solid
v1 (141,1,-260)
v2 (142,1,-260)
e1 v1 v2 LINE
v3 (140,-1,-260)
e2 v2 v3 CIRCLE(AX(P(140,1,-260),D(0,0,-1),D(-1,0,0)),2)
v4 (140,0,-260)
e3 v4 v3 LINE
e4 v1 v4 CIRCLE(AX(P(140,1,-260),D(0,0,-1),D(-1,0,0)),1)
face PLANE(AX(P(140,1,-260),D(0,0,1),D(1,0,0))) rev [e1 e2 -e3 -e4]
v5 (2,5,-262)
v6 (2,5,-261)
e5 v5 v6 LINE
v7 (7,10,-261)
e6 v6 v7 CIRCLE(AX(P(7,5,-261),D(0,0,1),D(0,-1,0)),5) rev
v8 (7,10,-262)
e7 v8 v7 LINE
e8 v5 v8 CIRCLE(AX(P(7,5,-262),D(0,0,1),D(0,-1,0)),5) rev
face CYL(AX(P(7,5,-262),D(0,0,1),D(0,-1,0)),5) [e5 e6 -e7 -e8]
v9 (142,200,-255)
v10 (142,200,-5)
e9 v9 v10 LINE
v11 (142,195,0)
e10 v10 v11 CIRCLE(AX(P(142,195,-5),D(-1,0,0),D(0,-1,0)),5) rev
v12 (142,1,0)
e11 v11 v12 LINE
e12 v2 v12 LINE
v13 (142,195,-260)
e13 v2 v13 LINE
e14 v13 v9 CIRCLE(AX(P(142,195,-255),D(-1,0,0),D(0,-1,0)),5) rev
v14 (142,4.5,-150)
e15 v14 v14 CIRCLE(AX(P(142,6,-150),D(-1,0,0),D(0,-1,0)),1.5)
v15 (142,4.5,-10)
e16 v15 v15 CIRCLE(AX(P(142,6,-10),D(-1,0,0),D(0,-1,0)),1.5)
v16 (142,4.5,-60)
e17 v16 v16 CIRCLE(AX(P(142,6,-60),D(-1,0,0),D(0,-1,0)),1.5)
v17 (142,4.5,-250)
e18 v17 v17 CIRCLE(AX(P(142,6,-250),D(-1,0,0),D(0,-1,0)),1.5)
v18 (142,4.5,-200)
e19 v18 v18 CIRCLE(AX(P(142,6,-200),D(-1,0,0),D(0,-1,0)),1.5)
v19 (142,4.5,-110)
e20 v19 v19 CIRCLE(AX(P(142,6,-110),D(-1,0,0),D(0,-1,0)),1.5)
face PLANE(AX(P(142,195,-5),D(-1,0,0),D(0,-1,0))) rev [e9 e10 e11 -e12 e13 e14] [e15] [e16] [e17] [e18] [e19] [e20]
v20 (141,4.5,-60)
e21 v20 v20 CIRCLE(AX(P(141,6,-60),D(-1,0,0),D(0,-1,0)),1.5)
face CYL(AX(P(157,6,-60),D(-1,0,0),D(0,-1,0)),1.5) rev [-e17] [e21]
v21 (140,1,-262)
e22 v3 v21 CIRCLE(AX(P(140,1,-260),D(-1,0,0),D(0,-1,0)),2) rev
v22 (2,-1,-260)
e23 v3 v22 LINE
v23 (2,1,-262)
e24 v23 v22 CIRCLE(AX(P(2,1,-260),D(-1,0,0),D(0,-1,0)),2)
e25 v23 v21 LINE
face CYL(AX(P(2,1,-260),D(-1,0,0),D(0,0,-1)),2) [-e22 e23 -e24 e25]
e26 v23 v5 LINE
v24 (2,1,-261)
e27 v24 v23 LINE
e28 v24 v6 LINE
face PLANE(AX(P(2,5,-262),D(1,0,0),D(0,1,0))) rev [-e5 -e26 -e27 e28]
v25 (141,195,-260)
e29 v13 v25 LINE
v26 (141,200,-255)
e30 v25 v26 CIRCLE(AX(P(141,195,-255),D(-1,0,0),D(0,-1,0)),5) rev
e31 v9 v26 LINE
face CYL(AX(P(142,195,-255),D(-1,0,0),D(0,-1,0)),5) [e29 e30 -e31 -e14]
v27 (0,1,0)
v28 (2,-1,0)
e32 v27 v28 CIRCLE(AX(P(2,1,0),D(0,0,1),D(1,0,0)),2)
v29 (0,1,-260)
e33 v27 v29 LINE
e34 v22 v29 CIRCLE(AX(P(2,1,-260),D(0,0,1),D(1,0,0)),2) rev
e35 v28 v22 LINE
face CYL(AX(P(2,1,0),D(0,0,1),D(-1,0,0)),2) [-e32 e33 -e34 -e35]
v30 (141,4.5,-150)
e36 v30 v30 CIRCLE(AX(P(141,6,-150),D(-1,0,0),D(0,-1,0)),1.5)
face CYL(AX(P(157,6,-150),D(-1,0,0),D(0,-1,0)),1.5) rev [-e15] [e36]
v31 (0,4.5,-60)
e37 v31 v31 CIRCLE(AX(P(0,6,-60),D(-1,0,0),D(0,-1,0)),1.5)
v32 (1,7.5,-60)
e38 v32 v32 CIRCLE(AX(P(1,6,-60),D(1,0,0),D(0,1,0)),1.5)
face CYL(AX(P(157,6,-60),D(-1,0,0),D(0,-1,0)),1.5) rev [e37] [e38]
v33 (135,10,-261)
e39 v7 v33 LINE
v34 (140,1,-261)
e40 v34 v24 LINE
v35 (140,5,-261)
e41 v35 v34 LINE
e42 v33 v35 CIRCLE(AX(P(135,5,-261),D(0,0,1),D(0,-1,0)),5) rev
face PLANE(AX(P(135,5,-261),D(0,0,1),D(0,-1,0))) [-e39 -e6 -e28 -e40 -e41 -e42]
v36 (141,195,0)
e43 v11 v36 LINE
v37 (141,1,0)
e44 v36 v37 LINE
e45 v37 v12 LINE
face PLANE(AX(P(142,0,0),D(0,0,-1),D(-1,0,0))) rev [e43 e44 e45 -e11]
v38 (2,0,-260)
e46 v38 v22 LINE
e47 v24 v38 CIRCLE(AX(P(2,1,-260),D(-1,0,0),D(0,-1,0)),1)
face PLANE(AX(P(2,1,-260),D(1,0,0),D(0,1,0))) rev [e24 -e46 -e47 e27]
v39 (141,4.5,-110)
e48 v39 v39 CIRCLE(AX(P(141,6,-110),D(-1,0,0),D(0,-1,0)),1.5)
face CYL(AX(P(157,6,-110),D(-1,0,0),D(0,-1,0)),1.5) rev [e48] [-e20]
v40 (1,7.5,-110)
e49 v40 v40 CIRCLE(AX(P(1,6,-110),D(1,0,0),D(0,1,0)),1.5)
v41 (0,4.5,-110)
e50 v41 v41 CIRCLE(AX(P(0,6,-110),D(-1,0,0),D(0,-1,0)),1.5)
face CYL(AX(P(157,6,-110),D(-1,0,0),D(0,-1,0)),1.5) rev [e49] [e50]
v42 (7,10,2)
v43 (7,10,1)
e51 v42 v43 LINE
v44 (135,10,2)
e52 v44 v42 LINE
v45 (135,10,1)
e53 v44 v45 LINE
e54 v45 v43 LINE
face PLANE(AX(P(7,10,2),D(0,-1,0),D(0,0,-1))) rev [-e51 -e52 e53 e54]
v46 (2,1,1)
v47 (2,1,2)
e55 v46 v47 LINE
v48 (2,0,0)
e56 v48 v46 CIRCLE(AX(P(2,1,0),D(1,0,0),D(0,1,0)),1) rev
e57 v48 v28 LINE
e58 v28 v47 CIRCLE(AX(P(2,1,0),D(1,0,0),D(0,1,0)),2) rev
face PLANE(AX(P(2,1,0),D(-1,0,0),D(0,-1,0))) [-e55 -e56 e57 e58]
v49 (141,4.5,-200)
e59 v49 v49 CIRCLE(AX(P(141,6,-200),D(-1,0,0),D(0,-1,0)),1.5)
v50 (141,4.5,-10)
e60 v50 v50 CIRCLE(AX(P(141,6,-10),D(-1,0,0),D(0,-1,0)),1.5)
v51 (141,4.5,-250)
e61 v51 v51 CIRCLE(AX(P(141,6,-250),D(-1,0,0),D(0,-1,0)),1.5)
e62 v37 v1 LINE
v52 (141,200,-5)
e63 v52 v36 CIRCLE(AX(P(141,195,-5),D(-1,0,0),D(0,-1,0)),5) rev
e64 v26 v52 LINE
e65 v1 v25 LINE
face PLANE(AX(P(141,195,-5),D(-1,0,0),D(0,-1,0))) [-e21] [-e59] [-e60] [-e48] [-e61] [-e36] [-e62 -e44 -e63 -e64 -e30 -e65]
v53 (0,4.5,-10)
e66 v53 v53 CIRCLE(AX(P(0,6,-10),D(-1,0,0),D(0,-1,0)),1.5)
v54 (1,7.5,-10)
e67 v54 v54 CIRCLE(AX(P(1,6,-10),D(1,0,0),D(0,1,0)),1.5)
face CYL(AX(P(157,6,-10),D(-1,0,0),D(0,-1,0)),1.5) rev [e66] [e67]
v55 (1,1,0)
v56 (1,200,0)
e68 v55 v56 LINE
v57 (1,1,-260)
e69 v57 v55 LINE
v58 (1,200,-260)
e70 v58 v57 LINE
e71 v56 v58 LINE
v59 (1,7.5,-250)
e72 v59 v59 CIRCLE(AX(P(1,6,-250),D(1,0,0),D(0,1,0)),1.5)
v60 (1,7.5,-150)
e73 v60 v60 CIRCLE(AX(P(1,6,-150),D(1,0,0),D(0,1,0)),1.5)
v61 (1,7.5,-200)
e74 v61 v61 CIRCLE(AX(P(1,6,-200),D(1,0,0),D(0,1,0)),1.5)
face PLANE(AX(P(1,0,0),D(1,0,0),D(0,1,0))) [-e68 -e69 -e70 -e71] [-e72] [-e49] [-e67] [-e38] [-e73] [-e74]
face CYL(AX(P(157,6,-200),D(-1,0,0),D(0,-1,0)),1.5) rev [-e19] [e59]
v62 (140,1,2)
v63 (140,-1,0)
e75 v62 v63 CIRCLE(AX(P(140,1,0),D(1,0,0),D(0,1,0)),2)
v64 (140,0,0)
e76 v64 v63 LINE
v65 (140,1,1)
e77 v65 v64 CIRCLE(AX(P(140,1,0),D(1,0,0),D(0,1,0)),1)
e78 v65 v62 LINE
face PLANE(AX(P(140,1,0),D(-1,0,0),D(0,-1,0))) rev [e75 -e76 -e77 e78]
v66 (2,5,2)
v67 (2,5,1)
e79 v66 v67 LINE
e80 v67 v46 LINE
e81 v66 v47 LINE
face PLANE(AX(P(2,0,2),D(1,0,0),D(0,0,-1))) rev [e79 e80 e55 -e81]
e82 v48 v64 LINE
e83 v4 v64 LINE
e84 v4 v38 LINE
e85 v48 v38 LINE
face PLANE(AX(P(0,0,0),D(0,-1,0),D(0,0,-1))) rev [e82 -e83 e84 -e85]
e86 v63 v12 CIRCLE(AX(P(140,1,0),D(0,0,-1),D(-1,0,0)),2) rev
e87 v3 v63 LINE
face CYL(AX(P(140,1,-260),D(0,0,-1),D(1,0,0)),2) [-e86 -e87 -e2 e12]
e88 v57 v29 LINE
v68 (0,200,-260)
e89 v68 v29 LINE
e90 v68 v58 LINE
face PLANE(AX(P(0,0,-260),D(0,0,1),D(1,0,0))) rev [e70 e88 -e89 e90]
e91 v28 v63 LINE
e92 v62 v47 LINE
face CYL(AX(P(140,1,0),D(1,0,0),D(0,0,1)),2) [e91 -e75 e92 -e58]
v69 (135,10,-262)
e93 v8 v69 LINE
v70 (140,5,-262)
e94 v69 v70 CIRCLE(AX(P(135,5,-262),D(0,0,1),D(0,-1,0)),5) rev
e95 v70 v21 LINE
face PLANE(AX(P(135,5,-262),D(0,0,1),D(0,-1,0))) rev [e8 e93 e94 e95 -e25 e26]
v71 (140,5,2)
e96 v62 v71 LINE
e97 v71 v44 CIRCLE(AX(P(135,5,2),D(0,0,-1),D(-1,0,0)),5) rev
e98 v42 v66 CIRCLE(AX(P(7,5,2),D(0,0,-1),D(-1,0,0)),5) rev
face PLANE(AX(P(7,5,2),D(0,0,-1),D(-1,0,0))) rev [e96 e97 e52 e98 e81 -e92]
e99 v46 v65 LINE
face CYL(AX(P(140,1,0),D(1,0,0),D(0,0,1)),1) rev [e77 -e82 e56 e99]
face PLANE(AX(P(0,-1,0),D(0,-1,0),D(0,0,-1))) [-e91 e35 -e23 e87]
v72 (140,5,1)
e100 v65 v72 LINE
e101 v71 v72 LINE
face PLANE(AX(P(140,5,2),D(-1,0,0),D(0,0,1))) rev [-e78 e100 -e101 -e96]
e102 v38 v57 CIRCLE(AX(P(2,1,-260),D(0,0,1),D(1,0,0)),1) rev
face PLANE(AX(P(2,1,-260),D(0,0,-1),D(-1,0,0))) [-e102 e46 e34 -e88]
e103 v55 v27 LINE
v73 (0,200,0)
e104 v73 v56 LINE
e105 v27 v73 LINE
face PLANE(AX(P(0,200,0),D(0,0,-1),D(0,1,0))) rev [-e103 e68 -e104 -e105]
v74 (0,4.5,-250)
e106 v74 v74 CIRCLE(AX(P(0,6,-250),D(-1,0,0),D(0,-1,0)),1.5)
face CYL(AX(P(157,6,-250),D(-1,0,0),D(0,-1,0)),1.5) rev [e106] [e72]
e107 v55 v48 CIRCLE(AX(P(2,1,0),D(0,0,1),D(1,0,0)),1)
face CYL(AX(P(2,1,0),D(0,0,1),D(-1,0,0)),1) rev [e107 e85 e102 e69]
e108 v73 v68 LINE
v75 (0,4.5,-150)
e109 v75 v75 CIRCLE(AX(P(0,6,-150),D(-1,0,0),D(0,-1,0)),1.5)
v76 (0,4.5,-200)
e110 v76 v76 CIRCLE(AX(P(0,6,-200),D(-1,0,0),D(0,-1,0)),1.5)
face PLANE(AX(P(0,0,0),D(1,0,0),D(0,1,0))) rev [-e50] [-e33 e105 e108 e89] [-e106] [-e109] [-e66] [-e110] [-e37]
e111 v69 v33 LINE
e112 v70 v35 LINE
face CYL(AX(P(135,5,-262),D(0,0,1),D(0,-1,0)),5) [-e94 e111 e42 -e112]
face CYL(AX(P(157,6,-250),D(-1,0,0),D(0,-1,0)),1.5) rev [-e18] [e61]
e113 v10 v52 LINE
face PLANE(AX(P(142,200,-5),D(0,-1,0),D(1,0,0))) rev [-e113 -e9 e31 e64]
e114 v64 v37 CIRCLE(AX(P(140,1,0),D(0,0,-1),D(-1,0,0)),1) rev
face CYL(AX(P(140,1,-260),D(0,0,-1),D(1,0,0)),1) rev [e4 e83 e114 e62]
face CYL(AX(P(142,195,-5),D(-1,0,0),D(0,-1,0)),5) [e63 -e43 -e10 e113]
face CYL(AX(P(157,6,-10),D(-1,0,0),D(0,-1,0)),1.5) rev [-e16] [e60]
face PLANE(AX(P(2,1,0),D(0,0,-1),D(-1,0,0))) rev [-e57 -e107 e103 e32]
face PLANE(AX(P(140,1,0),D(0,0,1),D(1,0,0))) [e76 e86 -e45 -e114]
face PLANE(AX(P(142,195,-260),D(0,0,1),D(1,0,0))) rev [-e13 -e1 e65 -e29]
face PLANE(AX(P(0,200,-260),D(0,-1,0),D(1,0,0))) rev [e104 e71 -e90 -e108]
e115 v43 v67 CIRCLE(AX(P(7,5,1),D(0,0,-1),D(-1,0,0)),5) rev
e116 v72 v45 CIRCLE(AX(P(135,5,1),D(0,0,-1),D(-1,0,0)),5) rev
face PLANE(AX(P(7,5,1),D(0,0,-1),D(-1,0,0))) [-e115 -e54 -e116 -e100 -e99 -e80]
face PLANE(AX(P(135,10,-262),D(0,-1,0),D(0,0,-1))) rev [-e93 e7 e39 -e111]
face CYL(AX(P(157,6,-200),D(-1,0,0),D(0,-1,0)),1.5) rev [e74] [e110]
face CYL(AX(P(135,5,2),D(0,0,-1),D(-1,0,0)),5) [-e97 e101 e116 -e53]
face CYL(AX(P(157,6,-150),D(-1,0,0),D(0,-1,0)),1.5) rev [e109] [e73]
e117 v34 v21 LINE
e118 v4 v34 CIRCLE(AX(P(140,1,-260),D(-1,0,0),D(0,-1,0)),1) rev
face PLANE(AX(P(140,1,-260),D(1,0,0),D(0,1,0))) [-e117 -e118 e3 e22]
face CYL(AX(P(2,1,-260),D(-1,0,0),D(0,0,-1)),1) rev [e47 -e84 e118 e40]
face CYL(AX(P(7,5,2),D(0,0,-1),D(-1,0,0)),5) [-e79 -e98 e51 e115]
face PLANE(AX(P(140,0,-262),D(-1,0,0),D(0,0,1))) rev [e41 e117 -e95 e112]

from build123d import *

# Parameters (mm, degrees)
SKETCH1_W                    = 142
SKETCH1_H                    = 260
BASE_FLANGE1_DEPTH           = 1
EDGE_FLANGE1_STRIP_W         = 6
EDGE_FLANGE1_STRIP_H         = 1
EDGE_FLANGE1_STRIP_CUT_DEPTH = 260
EDGE_FLANGE1_DEPTH           = 260
EDGE_FLANGE2_STRIP_W         = 6
EDGE_FLANGE2_STRIP_H         = 1
EDGE_FLANGE2_STRIP_CUT_DEPTH = 260
EDGE_FLANGE2_DEPTH           = 260
EDGE_FLANGE2_FLAT_DEPTH      = 1
EDGE_FLANGE4_DEPTH           = 138
EDGE_FLANGE4_START           = 1
EDGE_FLANGE4_FLAT_DEPTH      = 1
SKETCH12_R                   = 1.5
CUT_EXTRUDE1_DEPTH           = 157
EDGE_FLANGE5_DEPTH           = 138
EDGE_FLANGE5_START           = 1
EDGE_FLANGE5_FLAT_DEPTH      = 1


# Sheet-metal steps are written as plain solids
with BuildPart() as part:
    # Sketch1 → Base-Flange1 (new body)
    with BuildSketch(Plane(origin=(0, 0, 0), x_dir=(1, 0, 0), z_dir=(0, 1, 0))):
        with Locations((71, 130)):
            Rectangle(SKETCH1_W, SKETCH1_H)
    extrude(amount=-BASE_FLANGE1_DEPTH)

    # Edge-Flange1 strip (across the edge) → Edge-Flange1 strip cut (cut)
    with BuildSketch(Plane.XY.offset(-260)):
        with Locations((-1, -0.5)):
            Rectangle(EDGE_FLANGE1_STRIP_W, EDGE_FLANGE1_STRIP_H)
    extrude(amount=EDGE_FLANGE1_STRIP_CUT_DEPTH, mode=Mode.SUBTRACT)

    # Edge-Flange1 section (across the edge) → Edge-Flange1 (add)
    with BuildSketch(Plane.XY.offset(-260)):
        with BuildLine():
            Line((0, 1), (0, 200))
            Line((0, 200), (1, 200))
            Line((1, 200), (1, 1))
            ThreePointArc((1, 1), (1.292893219, 0.292893219), (2, 0))
            Line((2, 0), (2, -1))
            ThreePointArc((2, -1), (0.585786438, -0.414213562), (0, 1))
        make_face()
    extrude(amount=EDGE_FLANGE1_DEPTH)

    # Edge-Flange2 strip (across the edge) → Edge-Flange2 strip cut (cut)
    with BuildSketch(Plane(origin=(142, 0, 0), x_dir=(-1, 0, 0), z_dir=(0, 0, -1))):
        with Locations((-1, -0.5)):
            Rectangle(EDGE_FLANGE2_STRIP_W, EDGE_FLANGE2_STRIP_H)
    extrude(amount=EDGE_FLANGE2_STRIP_CUT_DEPTH, mode=Mode.SUBTRACT)

    # Edge-Flange2 bend section (across the edge) → Edge-Flange2 (add)
    with BuildSketch(Plane(origin=(142, 0, 0), x_dir=(-1, 0, 0), z_dir=(0, 0, -1))):
        with BuildLine():
            Line((0, 1), (1, 1))
            ThreePointArc((1, 1), (1.292893219, 0.292893219), (2, 0))
            Line((2, 0), (2, -1))
            ThreePointArc((2, -1), (0.585786438, -0.414213562), (0, 1))
        make_face()
    extrude(amount=EDGE_FLANGE2_DEPTH)

    # Edge-Flange2 profile (on flange) → Edge-Flange2 flat (add)
    with BuildSketch(Plane(origin=(142, 0, 0), x_dir=(0, 0, -1), z_dir=(1, 0, 0))):
        with BuildLine():
            ThreePointArc((5, 200), (1.464466094, 198.535533906), (0, 195))
            Line((0, 195), (0, 1))
            Line((0, 1), (260, 1))
            Line((260, 1), (260, 195))
            ThreePointArc((260, 195), (258.535533906, 198.535533906), (255, 200))
            Line((255, 200), (5, 200))
        make_face()
    extrude(amount=-EDGE_FLANGE2_FLAT_DEPTH)

    # Edge-Flange4 bend section (across the edge) → Edge-Flange4 (add)
    with BuildSketch(Plane(origin=(140, 0, -261), x_dir=(0, 0, 1), z_dir=(-1, 0, 0))):
        with BuildLine():
            Line((-1, 1), (0, 1))
            ThreePointArc((0, 1), (0.292893219, 0.292893219), (1, 0))
            Line((1, 0), (1, -1))
            ThreePointArc((1, -1), (-0.414213562, -0.414213562), (-1, 1))
        make_face()
    extrude(amount=EDGE_FLANGE4_DEPTH)

    # Edge-Flange4 profile (on flange) → Edge-Flange4 flat (add)
    with BuildSketch(Plane(origin=(0, 0, -261), x_dir=(-1, 0, 0), z_dir=(0, 0, -1)).offset(EDGE_FLANGE4_START)):
        with BuildLine():
            Line((-7, 10), (-135, 10))
            ThreePointArc((-135, 10), (-138.535533906, 8.535533906), (-140, 5))
            Line((-140, 5), (-140, 1))
            Line((-140, 1), (-2, 1))
            Line((-2, 1), (-2, 5))
            ThreePointArc((-2, 5), (-3.464466094, 8.535533906), (-7, 10))
        make_face()
    extrude(amount=-EDGE_FLANGE4_FLAT_DEPTH)

    # Sketch12 → Cut-Extrude1 (cut)
    with BuildSketch(Plane.ZY):
        with Locations(Location((-110, 6, 0), (0, 0, 270))):
            Circle(SKETCH12_R)
        with Locations(Location((-60, 6, 0), (0, 0, 270))):
            Circle(SKETCH12_R)
        with Locations(Location((-10, 6, 0), (0, 0, 270))):
            Circle(SKETCH12_R)
        with Locations(Location((-150, 6, 0), (0, 0, 270))):
            Circle(SKETCH12_R)
        with Locations(Location((-200, 6, 0), (0, 0, 270))):
            Circle(SKETCH12_R)
        with Locations(Location((-250, 6, 0), (0, 0, 270))):
            Circle(SKETCH12_R)
    extrude(amount=-CUT_EXTRUDE1_DEPTH, mode=Mode.SUBTRACT)

    # Edge-Flange5 bend section (across the edge) → Edge-Flange5 (add)
    with BuildSketch(Plane(origin=(2, 0, 1), x_dir=(0, 0, -1), z_dir=(1, 0, 0))):
        with BuildLine():
            Line((-1, 1), (0, 1))
            ThreePointArc((0, 1), (0.292893219, 0.292893219), (1, 0))
            Line((1, 0), (1, -1))
            ThreePointArc((1, -1), (-0.414213562, -0.414213562), (-1, 1))
        make_face()
    extrude(amount=EDGE_FLANGE5_DEPTH)

    # Edge-Flange5 profile (on flange) → Edge-Flange5 flat (add)
    with BuildSketch(Plane.XY.offset(1).offset(EDGE_FLANGE5_START)):
        with BuildLine():
            Line((135, 10), (7, 10))
            ThreePointArc((7, 10), (3.464466094, 8.535533906), (2, 5))
            Line((2, 5), (2, 1))
            Line((2, 1), (140, 1))
            Line((140, 1), (140, 5))
            ThreePointArc((140, 5), (138.535533906, 8.535533906), (135, 10))
        make_face()
    extrude(amount=-EDGE_FLANGE5_FLAT_DEPTH)


solid = part.part
